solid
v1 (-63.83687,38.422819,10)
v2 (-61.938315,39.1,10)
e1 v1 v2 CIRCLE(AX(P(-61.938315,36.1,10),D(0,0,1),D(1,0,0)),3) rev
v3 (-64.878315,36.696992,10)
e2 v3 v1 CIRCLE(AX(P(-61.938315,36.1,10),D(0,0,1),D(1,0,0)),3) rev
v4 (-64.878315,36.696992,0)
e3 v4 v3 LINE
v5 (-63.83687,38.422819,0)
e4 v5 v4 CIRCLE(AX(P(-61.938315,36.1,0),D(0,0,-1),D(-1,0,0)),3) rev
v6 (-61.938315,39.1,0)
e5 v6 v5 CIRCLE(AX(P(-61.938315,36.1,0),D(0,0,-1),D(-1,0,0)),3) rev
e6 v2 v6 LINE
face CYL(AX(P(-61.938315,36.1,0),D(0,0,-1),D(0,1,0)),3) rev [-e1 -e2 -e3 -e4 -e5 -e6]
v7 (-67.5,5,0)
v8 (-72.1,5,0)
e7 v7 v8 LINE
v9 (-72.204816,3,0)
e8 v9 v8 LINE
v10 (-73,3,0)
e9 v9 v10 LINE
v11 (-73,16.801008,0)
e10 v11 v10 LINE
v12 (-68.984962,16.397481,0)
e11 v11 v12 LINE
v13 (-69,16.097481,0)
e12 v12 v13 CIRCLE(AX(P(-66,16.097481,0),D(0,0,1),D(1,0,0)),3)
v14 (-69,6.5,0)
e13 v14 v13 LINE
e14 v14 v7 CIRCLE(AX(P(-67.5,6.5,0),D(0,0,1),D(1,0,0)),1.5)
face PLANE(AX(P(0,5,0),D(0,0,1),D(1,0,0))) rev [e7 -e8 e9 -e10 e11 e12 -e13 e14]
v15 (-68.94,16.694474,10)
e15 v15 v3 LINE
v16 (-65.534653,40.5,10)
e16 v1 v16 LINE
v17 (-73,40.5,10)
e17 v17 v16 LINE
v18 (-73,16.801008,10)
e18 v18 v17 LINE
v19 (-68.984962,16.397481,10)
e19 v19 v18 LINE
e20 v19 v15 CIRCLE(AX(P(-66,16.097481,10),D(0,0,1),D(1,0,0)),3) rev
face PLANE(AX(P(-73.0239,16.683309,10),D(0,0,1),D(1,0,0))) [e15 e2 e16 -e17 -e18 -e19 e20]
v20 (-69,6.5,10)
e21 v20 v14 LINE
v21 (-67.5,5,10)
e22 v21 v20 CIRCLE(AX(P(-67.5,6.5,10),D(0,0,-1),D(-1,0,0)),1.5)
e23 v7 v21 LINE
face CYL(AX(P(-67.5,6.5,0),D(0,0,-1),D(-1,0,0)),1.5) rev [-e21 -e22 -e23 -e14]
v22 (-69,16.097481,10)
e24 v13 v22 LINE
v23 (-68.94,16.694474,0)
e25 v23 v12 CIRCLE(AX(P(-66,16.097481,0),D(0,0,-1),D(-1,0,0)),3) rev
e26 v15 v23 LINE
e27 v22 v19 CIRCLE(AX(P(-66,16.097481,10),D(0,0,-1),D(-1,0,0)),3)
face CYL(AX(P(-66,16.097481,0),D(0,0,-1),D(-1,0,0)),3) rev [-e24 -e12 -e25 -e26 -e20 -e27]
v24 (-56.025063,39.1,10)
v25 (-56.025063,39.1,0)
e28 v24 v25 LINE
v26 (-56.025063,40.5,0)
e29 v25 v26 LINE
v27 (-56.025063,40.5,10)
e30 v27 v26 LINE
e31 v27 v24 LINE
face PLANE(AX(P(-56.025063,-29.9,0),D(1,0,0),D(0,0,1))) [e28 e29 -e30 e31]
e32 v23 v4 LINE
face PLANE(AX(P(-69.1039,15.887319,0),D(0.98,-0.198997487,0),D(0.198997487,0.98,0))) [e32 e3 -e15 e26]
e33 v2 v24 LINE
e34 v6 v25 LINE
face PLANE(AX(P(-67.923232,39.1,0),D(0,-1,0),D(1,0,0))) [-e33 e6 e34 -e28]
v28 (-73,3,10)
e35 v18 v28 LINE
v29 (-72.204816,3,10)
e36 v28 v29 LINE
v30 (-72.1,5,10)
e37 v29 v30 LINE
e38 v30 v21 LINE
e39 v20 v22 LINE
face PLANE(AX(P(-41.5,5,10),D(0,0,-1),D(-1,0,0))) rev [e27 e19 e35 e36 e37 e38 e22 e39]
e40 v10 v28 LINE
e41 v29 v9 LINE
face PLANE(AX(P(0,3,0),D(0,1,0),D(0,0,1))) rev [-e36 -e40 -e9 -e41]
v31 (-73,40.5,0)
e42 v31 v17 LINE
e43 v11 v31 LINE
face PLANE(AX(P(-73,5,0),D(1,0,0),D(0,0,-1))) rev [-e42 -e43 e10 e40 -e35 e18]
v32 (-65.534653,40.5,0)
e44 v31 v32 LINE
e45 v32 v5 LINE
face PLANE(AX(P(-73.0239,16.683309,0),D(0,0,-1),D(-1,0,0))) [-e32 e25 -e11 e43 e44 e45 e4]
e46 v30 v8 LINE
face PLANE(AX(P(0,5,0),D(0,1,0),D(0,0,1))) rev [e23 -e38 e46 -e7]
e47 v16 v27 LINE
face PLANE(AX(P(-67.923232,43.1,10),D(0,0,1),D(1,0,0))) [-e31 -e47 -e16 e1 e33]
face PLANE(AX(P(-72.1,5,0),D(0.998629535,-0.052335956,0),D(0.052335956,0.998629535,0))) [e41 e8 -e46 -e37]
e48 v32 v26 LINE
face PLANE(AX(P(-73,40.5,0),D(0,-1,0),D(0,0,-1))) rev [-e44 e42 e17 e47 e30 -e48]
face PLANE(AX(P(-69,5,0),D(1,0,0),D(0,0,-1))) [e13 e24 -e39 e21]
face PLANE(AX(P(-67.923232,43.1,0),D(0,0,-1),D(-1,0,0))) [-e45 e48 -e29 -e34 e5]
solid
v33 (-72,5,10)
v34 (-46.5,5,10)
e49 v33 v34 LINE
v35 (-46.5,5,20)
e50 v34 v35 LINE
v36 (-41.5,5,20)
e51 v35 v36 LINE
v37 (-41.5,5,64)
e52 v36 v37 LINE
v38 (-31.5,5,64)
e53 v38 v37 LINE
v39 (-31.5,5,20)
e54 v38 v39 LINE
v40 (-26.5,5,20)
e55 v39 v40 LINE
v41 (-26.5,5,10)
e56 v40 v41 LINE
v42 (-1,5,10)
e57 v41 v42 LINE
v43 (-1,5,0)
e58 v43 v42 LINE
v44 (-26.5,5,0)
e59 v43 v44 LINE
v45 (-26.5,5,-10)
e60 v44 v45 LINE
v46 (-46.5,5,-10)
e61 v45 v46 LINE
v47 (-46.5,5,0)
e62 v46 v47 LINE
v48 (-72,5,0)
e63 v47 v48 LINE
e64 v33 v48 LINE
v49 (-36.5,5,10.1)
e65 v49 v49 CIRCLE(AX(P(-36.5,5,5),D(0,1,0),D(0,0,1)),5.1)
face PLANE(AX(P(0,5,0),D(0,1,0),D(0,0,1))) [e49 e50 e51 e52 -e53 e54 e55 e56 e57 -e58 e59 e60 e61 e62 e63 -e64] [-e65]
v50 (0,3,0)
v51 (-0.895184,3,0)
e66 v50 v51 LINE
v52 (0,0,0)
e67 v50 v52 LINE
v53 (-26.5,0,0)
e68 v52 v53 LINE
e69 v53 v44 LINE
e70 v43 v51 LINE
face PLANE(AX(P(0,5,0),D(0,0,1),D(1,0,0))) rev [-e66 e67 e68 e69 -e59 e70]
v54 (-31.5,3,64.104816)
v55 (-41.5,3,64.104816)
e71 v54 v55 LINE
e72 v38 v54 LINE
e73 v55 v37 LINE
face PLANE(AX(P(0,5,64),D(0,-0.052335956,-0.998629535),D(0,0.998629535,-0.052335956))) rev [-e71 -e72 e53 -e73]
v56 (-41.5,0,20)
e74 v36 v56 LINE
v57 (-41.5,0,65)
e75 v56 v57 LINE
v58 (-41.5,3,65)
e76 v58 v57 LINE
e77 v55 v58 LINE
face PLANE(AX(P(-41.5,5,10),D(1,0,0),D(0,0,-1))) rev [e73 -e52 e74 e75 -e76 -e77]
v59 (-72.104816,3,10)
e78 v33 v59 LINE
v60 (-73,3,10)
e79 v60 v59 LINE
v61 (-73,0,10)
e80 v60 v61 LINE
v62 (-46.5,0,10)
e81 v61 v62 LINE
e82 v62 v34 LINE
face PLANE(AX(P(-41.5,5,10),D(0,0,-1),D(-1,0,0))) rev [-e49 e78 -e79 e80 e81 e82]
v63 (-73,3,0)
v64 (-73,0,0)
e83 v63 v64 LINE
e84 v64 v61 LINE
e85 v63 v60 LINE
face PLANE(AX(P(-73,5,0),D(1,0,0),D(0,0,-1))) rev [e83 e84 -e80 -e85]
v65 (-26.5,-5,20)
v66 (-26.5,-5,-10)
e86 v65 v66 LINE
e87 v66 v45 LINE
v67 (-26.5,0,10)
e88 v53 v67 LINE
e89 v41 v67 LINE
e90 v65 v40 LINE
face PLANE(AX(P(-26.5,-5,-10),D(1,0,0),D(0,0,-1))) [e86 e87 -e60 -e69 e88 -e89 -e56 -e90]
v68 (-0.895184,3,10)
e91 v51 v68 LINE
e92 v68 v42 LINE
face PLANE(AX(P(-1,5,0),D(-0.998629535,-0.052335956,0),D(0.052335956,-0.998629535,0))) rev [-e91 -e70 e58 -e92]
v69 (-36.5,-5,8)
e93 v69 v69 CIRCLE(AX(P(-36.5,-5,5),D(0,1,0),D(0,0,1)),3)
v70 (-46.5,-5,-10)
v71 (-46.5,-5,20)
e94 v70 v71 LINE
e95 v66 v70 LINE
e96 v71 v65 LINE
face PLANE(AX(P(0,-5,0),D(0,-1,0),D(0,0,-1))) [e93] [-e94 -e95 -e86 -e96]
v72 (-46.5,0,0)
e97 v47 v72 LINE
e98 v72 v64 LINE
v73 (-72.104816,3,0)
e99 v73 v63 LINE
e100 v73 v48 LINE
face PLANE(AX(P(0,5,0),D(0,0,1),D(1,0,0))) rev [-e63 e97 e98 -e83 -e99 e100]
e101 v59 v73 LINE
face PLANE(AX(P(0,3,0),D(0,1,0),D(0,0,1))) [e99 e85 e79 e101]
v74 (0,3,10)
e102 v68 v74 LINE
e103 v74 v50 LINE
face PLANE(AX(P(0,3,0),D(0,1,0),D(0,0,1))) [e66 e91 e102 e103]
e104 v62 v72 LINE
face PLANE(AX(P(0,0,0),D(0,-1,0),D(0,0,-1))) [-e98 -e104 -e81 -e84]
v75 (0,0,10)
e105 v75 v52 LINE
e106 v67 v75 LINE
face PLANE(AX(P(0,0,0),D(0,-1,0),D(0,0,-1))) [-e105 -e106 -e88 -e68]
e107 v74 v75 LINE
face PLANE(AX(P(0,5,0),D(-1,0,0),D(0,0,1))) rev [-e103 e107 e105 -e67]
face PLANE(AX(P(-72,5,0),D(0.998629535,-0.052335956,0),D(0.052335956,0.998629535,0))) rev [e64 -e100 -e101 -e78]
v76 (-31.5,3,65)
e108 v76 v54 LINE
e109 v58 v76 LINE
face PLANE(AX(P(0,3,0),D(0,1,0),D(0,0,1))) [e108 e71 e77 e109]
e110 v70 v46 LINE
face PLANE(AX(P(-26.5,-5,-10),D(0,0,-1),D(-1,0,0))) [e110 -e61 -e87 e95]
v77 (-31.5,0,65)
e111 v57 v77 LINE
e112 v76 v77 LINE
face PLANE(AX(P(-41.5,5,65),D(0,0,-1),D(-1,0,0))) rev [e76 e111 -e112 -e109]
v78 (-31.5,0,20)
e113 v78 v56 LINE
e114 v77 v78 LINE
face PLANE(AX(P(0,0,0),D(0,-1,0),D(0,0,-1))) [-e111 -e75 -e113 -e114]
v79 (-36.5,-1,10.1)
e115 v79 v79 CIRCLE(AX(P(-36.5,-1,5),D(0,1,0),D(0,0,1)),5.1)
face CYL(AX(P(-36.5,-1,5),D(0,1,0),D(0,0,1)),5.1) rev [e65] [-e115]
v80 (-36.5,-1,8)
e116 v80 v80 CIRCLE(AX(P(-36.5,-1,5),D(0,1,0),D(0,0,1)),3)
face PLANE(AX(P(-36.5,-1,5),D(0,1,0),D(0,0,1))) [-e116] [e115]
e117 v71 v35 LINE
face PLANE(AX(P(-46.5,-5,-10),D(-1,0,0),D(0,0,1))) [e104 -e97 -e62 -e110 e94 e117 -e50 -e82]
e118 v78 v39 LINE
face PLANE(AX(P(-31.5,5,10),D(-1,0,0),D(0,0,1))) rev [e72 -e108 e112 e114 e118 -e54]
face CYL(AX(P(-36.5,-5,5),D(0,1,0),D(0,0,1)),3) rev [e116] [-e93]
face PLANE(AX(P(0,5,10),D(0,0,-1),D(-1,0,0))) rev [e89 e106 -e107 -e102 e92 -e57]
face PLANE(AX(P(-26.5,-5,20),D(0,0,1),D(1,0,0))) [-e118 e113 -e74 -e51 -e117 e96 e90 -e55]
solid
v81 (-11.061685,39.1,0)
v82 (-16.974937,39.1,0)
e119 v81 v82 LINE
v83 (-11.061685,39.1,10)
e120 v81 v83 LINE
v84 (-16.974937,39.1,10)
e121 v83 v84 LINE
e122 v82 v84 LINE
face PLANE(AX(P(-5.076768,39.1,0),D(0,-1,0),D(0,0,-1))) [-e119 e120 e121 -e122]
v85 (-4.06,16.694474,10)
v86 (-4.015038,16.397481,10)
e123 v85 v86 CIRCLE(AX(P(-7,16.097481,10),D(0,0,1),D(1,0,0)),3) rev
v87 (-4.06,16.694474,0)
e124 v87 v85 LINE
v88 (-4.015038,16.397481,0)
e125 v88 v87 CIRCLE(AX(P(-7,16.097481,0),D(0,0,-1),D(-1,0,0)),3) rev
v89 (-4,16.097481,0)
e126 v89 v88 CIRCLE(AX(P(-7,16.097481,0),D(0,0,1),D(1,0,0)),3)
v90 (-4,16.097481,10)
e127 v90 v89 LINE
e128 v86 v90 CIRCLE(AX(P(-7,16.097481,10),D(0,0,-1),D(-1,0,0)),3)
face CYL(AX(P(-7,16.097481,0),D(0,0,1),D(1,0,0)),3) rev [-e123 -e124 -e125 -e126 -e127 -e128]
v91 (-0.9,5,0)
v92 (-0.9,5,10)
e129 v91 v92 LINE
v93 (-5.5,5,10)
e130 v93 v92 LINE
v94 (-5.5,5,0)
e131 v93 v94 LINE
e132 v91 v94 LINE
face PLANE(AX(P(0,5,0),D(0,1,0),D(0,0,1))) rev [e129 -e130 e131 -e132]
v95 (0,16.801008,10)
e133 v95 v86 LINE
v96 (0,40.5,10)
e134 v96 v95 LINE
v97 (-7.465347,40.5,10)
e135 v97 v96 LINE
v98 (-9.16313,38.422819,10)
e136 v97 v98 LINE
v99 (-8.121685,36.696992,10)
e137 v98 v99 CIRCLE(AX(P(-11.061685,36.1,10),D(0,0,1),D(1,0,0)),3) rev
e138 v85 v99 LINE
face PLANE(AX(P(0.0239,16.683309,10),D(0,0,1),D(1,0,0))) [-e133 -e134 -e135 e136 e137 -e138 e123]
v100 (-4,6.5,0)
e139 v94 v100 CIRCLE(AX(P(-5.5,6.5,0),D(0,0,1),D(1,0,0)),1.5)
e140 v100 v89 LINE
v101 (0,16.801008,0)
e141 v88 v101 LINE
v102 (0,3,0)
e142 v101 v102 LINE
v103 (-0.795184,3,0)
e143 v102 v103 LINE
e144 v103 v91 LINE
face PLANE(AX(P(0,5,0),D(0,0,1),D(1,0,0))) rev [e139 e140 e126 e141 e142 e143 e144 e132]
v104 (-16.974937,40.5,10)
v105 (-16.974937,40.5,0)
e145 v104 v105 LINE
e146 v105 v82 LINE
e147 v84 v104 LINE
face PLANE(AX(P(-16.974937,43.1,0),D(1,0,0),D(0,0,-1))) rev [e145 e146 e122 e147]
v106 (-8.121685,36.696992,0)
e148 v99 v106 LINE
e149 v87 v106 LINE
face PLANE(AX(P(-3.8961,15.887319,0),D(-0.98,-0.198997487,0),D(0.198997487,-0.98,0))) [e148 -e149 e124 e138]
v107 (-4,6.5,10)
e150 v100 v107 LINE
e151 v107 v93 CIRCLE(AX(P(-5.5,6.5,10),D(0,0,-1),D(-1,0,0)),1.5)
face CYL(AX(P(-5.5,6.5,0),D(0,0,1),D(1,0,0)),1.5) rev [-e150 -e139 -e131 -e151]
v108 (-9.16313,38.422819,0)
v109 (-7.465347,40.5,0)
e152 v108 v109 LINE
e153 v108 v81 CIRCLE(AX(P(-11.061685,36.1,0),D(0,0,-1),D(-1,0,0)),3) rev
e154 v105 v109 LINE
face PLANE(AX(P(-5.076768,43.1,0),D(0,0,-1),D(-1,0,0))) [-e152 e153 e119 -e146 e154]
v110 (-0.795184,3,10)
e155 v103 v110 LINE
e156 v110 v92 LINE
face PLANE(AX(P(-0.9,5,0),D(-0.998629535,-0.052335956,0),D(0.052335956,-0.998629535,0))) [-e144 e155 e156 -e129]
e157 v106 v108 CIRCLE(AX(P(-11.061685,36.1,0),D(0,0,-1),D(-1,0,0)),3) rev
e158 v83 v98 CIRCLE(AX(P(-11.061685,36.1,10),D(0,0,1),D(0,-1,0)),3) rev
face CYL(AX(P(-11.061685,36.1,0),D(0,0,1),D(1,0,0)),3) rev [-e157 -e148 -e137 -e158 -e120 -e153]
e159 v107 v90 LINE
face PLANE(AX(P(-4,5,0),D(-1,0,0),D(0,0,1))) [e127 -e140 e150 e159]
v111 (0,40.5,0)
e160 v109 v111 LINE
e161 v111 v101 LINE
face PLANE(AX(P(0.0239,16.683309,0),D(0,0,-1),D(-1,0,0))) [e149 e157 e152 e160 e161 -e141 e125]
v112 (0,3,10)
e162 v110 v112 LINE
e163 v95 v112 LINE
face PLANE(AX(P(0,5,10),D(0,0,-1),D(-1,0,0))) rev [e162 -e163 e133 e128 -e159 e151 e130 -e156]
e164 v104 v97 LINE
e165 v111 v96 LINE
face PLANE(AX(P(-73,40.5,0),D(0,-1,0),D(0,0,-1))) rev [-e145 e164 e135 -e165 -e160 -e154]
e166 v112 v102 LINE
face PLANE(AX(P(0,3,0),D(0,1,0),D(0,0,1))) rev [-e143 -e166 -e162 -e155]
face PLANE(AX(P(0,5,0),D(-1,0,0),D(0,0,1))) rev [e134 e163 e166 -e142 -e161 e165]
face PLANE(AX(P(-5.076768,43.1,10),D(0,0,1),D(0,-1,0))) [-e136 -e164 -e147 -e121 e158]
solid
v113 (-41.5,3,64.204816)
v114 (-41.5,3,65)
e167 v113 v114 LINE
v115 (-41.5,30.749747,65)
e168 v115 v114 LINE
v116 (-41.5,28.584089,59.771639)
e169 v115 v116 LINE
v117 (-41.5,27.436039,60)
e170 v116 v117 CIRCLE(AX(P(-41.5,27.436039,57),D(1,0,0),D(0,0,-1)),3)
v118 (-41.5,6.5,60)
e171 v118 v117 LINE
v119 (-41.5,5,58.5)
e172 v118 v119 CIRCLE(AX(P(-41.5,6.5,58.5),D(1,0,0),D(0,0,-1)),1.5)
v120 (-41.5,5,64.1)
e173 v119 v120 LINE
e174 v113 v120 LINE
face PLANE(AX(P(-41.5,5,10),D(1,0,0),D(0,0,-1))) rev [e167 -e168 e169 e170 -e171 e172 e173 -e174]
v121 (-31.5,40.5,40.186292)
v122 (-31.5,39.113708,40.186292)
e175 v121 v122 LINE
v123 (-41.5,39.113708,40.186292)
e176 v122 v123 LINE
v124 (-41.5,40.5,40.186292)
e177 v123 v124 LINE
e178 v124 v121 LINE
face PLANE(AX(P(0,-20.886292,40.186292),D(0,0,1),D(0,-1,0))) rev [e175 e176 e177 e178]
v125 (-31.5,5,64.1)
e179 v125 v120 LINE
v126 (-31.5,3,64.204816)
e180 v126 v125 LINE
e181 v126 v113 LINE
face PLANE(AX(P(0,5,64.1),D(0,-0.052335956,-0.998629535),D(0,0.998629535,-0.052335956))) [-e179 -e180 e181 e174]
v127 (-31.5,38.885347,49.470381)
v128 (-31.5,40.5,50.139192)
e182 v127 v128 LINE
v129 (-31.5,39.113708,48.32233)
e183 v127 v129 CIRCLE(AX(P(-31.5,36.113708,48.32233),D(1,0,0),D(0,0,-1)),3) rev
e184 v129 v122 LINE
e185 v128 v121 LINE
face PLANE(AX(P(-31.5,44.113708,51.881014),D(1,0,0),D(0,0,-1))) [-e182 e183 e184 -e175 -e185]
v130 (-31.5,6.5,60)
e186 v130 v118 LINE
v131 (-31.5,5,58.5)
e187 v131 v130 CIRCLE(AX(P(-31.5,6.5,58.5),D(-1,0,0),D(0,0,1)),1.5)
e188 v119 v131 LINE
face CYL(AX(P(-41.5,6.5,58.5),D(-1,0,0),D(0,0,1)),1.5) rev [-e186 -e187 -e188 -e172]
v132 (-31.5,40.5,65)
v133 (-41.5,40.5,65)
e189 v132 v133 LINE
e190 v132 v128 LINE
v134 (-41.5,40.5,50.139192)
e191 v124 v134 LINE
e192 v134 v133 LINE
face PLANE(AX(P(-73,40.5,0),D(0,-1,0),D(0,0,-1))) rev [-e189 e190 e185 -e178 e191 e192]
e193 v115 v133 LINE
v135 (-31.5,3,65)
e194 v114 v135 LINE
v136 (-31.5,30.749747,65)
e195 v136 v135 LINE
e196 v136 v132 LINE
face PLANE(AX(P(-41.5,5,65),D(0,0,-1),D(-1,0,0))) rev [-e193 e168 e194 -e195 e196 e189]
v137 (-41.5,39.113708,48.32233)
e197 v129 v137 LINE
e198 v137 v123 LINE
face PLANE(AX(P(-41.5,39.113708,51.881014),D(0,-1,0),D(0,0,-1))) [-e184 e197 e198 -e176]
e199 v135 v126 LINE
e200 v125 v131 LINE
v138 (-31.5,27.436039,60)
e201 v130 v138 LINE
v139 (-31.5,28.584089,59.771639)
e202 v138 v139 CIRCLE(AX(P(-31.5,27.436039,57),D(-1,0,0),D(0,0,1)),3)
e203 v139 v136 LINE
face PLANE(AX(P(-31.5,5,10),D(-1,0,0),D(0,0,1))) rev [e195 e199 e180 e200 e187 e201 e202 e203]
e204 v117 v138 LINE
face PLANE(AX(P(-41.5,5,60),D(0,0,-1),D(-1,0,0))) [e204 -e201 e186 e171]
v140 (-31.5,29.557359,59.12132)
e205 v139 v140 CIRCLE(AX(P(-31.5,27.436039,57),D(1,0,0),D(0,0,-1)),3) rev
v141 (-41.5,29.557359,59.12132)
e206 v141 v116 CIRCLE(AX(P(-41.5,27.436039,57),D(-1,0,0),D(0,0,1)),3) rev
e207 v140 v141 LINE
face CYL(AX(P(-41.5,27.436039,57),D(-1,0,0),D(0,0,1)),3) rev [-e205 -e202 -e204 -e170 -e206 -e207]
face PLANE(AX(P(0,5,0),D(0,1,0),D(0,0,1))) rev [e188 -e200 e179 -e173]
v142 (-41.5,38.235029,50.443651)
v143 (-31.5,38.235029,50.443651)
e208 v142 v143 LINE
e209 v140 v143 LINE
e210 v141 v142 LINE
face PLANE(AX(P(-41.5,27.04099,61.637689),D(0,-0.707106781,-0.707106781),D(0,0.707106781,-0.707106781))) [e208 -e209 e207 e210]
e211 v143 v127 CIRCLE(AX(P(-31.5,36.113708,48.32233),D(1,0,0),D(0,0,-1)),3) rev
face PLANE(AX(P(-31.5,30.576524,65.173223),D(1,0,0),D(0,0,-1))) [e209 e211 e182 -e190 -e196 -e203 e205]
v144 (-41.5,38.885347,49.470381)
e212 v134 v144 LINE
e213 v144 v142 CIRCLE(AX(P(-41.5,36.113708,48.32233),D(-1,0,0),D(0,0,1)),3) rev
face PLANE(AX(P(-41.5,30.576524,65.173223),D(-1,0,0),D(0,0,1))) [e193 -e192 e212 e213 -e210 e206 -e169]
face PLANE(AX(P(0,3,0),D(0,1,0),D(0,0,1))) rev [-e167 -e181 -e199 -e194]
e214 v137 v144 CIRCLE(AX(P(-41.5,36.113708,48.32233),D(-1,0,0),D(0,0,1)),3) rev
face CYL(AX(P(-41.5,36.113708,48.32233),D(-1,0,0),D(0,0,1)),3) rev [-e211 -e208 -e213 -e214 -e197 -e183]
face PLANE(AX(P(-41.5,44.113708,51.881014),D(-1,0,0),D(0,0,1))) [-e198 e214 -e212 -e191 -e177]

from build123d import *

# Parameters (mm, degrees)
BOSS_EXTRUDE1_DEPTH      = 5
SKETCH2_W                = 10
SKETCH2_H                = 5
SKETCH5_W                = 4
SKETCH5_H                = 10
SKETCH15_W               = 4
SKETCH15_H               = 10
FILLET1_R                = 3
FILLET2_R                = 3
FILLET3_R                = 1.5
FILLET4_R                = 3
FILLET5_R                = 1.5
LIP_GROOVE1_GROOVE_START = -41.5
LIP_GROOVE1_GROOVE_DEPTH = 10
LIP_GROOVE1_LIP_START    = -41.5
LIP_GROOVE1_LIP_DEPTH    = 10
LIP_GROOVE2_GROOVE_DEPTH = 10
LIP_GROOVE2_LIP_DEPTH    = 10
LIP_GROOVE3_GROOVE_DEPTH = 10
LIP_GROOVE3_LIP_DEPTH    = 10
BOSS_EXTRUDE2_DEPTH      = 10
BOSS_EXTRUDE3_DEPTH      = 10
CUT_EXTRUDE1_START       = -10
CUT_EXTRUDE1_OUTLINE_W   = 16.974937186
CUT_EXTRUDE1_OUTLINE_H   = 2.6
CUT_EXTRUDE1_OUTLINE_W_2 = 10
CUT_EXTRUDE1_OUTLINE_H_2 = 3.613708499
CUT_EXTRUDE1_DEPTH       = 65
SKETCH25_W               = 20
SKETCH25_H               = 30
BOSS_EXTRUDE4_DEPTH      = 10
SKETCH40_R               = 5.1
CUT_EXTRUDE4_DEPTH       = 6
SKETCH43_R               = 3
CUT_EXTRUDE5_DEPTH       = 104.991586198


# Read off the part's stored shape, not the designer's step: Lip&Groove1-Groove, Lip&Groove1-Lip, Lip&Groove2-Groove, Lip&Groove2-Lip, Lip&Groove3-Groove, Lip&Groove3-Lip, Cut-Extrude1
with BuildPart() as part:
    # Sketch1 → Boss-Extrude1 (new body)
    with BuildSketch(Plane(origin=(0, 0, 0), x_dir=(1, 0, 0), z_dir=(0, 1, 0))):
        Polygon((-41.5, -10), (-73, -10), (-73, 0), (0, 0), (0, -10), (-31.5, -10), (-31.5, -65), (-41.5, -65), align=None)
    extrude(amount=BOSS_EXTRUDE1_DEPTH)

    # Sweep1: sweep along a path in Sketch4
    with BuildLine(Plane.ZY.offset(36.5)) as sweep1_path:
        Line((61.5, 5), (61.5, 29.3))
        Line((61.5, 29.3), (50.186291501, 40.613708499))
        Line((50.186291501, 40.613708499), (40.186291501, 40.613708499))
    # Sketch2 → Sweep1 (sweep)
    with BuildSketch(Plane(origin=(0, 5, 0), x_dir=(1, 0, 0), z_dir=(0, 1, 0))):
        with Locations((-36.5, -62.5)):
            Rectangle(SKETCH2_W, SKETCH2_H)
    sweep(path=sweep1_path.line, transition=Transition.RIGHT)

    # Sweep6: sweep along a path in Sketch11
    with BuildLine(Plane(origin=(0, 0, 5), x_dir=(-1, 0, 0), z_dir=(0, 0, -1))) as sweep6_path:
        Line((71, 5), (71, 16.6))
        Line((71, 16.6), (66.025062814, 41.1))
        Line((66.025062814, 41.1), (56.025062814, 41.1))
    # Sketch5 → Sweep6 (sweep)
    with BuildSketch(Plane(origin=(0, 5, 0), x_dir=(1, 0, 0), z_dir=(0, 1, 0))):
        with Locations((-71, -5)):
            Rectangle(SKETCH5_W, SKETCH5_H)
    sweep(path=sweep6_path.line, transition=Transition.RIGHT)

    # Sweep7: sweep along a path in Sketch16
    with BuildLine(Plane(origin=(0, 0, 5), x_dir=(-1, 0, 0), z_dir=(0, 0, -1))) as sweep7_path:
        Line((2, 5), (2, 16.6))
        Line((2, 16.6), (6.974937186, 41.1))
        Line((6.974937186, 41.1), (16.974937186, 41.1))
    # Sketch15 → Sweep7 (sweep)
    with BuildSketch(Plane(origin=(0, 5, 0), x_dir=(1, 0, 0), z_dir=(0, 1, 0))):
        with Locations((-2, -5)):
            Rectangle(SKETCH15_W, SKETCH15_H)
    sweep(path=sweep7_path.line, transition=Transition.RIGHT)

    # Fillet1
    fillet1_edges = [part.edges().sort_by_distance(p)[0] for p in [
        (-64.390363809, 39.1, 5),
        (-8.609636191, 39.1, 5),
    ]]
    fillet(fillet1_edges, radius=FILLET1_R)

    # Fillet2
    fillet2_edges = [part.edges().sort_by_distance(p)[0] for p in [
        (-69, 16.398992437, 5),
        (-4, 16.398992437, 5),
    ]]
    fillet(fillet2_edges, radius=FILLET2_R)

    # Fillet3
    fillet3_edges = [part.edges().sort_by_distance(p)[0] for p in [
        (-69, 5, 5),
        (-4, 5, 5),
    ]]
    fillet(fillet3_edges, radius=FILLET3_R)

    # Fillet4
    fillet4_edges = [part.edges().sort_by_distance(p)[0] for p in [
        (-36.5, 39.113708499, 49.564971157),
        (-36.5, 28.678679656, 60),
    ]]
    fillet(fillet4_edges, radius=FILLET4_R)

    # Fillet5
    fillet5_edges = [part.edges().sort_by_distance(p)[0] for p in [
        (-36.5, 5, 60),
    ]]
    fillet(fillet5_edges, radius=FILLET5_R)


with BuildPart() as body_2:
    # Split1: the piece on the far side of the plane
    add(part.part)
    split(bisect_by=Plane.ZX.offset(5), keep=Keep.BOTTOM)

    # Lip&Groove1-Groove outline → Lip&Groove1-Groove (cut)
    with BuildSketch(Plane.YZ.offset(LIP_GROOVE1_GROOVE_START)):
        Polygon((3, 65), (3, 64.104815559), (5, 64), (5, 65), align=None)
    extrude(amount=LIP_GROOVE1_GROOVE_DEPTH, mode=Mode.SUBTRACT)

    # Lip&Groove2-Groove outline → Lip&Groove2-Groove (cut)
    with BuildSketch(Plane.XY):
        Polygon((-73, 3), (-72.104815559, 3), (-72, 5), (-73, 5), align=None)
    extrude(amount=LIP_GROOVE2_GROOVE_DEPTH, mode=Mode.SUBTRACT)

    # Lip&Groove3-Groove outline → Lip&Groove3-Groove (cut)
    with BuildSketch(Plane.XY):
        Polygon((-0.895184441, 3), (0, 3), (0, 5), (-1, 5), align=None)
    extrude(amount=LIP_GROOVE3_GROOVE_DEPTH, mode=Mode.SUBTRACT)

    # Sketch25 → Boss-Extrude4 (add)
    with BuildSketch(Plane(origin=(0, 5, 0), x_dir=(1, 0, 0), z_dir=(0, 1, 0))):
        with Locations((-36.5, -5)):
            Rectangle(SKETCH25_W, SKETCH25_H)
    extrude(amount=-BOSS_EXTRUDE4_DEPTH)

    # Sketch40 → Cut-Extrude4 (cut)
    with BuildSketch(Plane(origin=(0, 5, 0), x_dir=(1, 0, 0), z_dir=(0, 1, 0))):
        with Locations(Location((-36.5, -5, 0), (0, 0, 270))):
            Circle(SKETCH40_R)
    extrude(amount=-CUT_EXTRUDE4_DEPTH, mode=Mode.SUBTRACT)

    # Sketch43 → Cut-Extrude5 (cut, through all)
    with BuildSketch(Plane(origin=(0, 5, 0), x_dir=(1, 0, 0), z_dir=(0, 1, 0))):
        with Locations(Location((-36.5, -5, 0), (0, 0, 270))):
            Circle(SKETCH43_R)
    extrude(amount=-CUT_EXTRUDE5_DEPTH, mode=Mode.SUBTRACT)


with BuildPart() as part_1:
    add(part.part)

    # Split1
    split(bisect_by=Plane.ZX.offset(5), keep=Keep.TOP)

    # Lip&Groove1-Lip outline → Lip&Groove1-Lip (add)
    with BuildSketch(Plane.YZ.offset(LIP_GROOVE1_LIP_START)):
        Polygon((3, 65), (3, 64.204815559), (5, 64.1), (5, 65), align=None)
    extrude(amount=LIP_GROOVE1_LIP_DEPTH)

    # Lip&Groove2-Lip outline → Lip&Groove2-Lip (add)
    with BuildSketch(Plane.XY):
        Polygon((-73, 5), (-73, 3), (-72.204815559, 3), (-72.1, 5), align=None)
    extrude(amount=LIP_GROOVE2_LIP_DEPTH)

    # Lip&Groove3-Lip outline → Lip&Groove3-Lip (add)
    with BuildSketch(Plane.XY):
        Polygon((-0.795184441, 3), (0, 3), (0, 5), (-0.9, 5), align=None)
    extrude(amount=LIP_GROOVE3_LIP_DEPTH)

    # Sketch18 → Boss-Extrude2 (add)
    with BuildSketch(Plane(origin=(0, 0, 0), x_dir=(-1, 0, 0), z_dir=(0, 0, -1))):
        Polygon((0, 16.801007563), (0, 43.1), (5.34023818, 43.1), align=None)
        Polygon((67.65976182, 43.1), (73, 43.1), (73, 16.801007563), align=None)
    extrude(amount=-BOSS_EXTRUDE2_DEPTH)

    # Sketch19 → Boss-Extrude3 (add)
    with BuildSketch(Plane.ZY.offset(41.5)):
        Polygon((51.636038969, 44.113708499), (65, 44.113708499), (65, 30.749747468), align=None)
    extrude(amount=-BOSS_EXTRUDE3_DEPTH)

    # Cut-Extrude1 outline → Cut-Extrude1 (cut)
    with BuildSketch(Plane.XY.offset(10).offset(CUT_EXTRUDE1_START)):
        with Locations((-64.512531407, 41.8)):
            Rectangle(CUT_EXTRUDE1_OUTLINE_W, CUT_EXTRUDE1_OUTLINE_H)
        with Locations((-8.487468593, 41.8)):
            Rectangle(CUT_EXTRUDE1_OUTLINE_W, CUT_EXTRUDE1_OUTLINE_H)
        with Locations((-36.5, 42.30685425)):
            Rectangle(CUT_EXTRUDE1_OUTLINE_W_2, CUT_EXTRUDE1_OUTLINE_H_2)
    extrude(amount=CUT_EXTRUDE1_DEPTH, mode=Mode.SUBTRACT)


solid = Compound([body_2.part, part_1.part])
